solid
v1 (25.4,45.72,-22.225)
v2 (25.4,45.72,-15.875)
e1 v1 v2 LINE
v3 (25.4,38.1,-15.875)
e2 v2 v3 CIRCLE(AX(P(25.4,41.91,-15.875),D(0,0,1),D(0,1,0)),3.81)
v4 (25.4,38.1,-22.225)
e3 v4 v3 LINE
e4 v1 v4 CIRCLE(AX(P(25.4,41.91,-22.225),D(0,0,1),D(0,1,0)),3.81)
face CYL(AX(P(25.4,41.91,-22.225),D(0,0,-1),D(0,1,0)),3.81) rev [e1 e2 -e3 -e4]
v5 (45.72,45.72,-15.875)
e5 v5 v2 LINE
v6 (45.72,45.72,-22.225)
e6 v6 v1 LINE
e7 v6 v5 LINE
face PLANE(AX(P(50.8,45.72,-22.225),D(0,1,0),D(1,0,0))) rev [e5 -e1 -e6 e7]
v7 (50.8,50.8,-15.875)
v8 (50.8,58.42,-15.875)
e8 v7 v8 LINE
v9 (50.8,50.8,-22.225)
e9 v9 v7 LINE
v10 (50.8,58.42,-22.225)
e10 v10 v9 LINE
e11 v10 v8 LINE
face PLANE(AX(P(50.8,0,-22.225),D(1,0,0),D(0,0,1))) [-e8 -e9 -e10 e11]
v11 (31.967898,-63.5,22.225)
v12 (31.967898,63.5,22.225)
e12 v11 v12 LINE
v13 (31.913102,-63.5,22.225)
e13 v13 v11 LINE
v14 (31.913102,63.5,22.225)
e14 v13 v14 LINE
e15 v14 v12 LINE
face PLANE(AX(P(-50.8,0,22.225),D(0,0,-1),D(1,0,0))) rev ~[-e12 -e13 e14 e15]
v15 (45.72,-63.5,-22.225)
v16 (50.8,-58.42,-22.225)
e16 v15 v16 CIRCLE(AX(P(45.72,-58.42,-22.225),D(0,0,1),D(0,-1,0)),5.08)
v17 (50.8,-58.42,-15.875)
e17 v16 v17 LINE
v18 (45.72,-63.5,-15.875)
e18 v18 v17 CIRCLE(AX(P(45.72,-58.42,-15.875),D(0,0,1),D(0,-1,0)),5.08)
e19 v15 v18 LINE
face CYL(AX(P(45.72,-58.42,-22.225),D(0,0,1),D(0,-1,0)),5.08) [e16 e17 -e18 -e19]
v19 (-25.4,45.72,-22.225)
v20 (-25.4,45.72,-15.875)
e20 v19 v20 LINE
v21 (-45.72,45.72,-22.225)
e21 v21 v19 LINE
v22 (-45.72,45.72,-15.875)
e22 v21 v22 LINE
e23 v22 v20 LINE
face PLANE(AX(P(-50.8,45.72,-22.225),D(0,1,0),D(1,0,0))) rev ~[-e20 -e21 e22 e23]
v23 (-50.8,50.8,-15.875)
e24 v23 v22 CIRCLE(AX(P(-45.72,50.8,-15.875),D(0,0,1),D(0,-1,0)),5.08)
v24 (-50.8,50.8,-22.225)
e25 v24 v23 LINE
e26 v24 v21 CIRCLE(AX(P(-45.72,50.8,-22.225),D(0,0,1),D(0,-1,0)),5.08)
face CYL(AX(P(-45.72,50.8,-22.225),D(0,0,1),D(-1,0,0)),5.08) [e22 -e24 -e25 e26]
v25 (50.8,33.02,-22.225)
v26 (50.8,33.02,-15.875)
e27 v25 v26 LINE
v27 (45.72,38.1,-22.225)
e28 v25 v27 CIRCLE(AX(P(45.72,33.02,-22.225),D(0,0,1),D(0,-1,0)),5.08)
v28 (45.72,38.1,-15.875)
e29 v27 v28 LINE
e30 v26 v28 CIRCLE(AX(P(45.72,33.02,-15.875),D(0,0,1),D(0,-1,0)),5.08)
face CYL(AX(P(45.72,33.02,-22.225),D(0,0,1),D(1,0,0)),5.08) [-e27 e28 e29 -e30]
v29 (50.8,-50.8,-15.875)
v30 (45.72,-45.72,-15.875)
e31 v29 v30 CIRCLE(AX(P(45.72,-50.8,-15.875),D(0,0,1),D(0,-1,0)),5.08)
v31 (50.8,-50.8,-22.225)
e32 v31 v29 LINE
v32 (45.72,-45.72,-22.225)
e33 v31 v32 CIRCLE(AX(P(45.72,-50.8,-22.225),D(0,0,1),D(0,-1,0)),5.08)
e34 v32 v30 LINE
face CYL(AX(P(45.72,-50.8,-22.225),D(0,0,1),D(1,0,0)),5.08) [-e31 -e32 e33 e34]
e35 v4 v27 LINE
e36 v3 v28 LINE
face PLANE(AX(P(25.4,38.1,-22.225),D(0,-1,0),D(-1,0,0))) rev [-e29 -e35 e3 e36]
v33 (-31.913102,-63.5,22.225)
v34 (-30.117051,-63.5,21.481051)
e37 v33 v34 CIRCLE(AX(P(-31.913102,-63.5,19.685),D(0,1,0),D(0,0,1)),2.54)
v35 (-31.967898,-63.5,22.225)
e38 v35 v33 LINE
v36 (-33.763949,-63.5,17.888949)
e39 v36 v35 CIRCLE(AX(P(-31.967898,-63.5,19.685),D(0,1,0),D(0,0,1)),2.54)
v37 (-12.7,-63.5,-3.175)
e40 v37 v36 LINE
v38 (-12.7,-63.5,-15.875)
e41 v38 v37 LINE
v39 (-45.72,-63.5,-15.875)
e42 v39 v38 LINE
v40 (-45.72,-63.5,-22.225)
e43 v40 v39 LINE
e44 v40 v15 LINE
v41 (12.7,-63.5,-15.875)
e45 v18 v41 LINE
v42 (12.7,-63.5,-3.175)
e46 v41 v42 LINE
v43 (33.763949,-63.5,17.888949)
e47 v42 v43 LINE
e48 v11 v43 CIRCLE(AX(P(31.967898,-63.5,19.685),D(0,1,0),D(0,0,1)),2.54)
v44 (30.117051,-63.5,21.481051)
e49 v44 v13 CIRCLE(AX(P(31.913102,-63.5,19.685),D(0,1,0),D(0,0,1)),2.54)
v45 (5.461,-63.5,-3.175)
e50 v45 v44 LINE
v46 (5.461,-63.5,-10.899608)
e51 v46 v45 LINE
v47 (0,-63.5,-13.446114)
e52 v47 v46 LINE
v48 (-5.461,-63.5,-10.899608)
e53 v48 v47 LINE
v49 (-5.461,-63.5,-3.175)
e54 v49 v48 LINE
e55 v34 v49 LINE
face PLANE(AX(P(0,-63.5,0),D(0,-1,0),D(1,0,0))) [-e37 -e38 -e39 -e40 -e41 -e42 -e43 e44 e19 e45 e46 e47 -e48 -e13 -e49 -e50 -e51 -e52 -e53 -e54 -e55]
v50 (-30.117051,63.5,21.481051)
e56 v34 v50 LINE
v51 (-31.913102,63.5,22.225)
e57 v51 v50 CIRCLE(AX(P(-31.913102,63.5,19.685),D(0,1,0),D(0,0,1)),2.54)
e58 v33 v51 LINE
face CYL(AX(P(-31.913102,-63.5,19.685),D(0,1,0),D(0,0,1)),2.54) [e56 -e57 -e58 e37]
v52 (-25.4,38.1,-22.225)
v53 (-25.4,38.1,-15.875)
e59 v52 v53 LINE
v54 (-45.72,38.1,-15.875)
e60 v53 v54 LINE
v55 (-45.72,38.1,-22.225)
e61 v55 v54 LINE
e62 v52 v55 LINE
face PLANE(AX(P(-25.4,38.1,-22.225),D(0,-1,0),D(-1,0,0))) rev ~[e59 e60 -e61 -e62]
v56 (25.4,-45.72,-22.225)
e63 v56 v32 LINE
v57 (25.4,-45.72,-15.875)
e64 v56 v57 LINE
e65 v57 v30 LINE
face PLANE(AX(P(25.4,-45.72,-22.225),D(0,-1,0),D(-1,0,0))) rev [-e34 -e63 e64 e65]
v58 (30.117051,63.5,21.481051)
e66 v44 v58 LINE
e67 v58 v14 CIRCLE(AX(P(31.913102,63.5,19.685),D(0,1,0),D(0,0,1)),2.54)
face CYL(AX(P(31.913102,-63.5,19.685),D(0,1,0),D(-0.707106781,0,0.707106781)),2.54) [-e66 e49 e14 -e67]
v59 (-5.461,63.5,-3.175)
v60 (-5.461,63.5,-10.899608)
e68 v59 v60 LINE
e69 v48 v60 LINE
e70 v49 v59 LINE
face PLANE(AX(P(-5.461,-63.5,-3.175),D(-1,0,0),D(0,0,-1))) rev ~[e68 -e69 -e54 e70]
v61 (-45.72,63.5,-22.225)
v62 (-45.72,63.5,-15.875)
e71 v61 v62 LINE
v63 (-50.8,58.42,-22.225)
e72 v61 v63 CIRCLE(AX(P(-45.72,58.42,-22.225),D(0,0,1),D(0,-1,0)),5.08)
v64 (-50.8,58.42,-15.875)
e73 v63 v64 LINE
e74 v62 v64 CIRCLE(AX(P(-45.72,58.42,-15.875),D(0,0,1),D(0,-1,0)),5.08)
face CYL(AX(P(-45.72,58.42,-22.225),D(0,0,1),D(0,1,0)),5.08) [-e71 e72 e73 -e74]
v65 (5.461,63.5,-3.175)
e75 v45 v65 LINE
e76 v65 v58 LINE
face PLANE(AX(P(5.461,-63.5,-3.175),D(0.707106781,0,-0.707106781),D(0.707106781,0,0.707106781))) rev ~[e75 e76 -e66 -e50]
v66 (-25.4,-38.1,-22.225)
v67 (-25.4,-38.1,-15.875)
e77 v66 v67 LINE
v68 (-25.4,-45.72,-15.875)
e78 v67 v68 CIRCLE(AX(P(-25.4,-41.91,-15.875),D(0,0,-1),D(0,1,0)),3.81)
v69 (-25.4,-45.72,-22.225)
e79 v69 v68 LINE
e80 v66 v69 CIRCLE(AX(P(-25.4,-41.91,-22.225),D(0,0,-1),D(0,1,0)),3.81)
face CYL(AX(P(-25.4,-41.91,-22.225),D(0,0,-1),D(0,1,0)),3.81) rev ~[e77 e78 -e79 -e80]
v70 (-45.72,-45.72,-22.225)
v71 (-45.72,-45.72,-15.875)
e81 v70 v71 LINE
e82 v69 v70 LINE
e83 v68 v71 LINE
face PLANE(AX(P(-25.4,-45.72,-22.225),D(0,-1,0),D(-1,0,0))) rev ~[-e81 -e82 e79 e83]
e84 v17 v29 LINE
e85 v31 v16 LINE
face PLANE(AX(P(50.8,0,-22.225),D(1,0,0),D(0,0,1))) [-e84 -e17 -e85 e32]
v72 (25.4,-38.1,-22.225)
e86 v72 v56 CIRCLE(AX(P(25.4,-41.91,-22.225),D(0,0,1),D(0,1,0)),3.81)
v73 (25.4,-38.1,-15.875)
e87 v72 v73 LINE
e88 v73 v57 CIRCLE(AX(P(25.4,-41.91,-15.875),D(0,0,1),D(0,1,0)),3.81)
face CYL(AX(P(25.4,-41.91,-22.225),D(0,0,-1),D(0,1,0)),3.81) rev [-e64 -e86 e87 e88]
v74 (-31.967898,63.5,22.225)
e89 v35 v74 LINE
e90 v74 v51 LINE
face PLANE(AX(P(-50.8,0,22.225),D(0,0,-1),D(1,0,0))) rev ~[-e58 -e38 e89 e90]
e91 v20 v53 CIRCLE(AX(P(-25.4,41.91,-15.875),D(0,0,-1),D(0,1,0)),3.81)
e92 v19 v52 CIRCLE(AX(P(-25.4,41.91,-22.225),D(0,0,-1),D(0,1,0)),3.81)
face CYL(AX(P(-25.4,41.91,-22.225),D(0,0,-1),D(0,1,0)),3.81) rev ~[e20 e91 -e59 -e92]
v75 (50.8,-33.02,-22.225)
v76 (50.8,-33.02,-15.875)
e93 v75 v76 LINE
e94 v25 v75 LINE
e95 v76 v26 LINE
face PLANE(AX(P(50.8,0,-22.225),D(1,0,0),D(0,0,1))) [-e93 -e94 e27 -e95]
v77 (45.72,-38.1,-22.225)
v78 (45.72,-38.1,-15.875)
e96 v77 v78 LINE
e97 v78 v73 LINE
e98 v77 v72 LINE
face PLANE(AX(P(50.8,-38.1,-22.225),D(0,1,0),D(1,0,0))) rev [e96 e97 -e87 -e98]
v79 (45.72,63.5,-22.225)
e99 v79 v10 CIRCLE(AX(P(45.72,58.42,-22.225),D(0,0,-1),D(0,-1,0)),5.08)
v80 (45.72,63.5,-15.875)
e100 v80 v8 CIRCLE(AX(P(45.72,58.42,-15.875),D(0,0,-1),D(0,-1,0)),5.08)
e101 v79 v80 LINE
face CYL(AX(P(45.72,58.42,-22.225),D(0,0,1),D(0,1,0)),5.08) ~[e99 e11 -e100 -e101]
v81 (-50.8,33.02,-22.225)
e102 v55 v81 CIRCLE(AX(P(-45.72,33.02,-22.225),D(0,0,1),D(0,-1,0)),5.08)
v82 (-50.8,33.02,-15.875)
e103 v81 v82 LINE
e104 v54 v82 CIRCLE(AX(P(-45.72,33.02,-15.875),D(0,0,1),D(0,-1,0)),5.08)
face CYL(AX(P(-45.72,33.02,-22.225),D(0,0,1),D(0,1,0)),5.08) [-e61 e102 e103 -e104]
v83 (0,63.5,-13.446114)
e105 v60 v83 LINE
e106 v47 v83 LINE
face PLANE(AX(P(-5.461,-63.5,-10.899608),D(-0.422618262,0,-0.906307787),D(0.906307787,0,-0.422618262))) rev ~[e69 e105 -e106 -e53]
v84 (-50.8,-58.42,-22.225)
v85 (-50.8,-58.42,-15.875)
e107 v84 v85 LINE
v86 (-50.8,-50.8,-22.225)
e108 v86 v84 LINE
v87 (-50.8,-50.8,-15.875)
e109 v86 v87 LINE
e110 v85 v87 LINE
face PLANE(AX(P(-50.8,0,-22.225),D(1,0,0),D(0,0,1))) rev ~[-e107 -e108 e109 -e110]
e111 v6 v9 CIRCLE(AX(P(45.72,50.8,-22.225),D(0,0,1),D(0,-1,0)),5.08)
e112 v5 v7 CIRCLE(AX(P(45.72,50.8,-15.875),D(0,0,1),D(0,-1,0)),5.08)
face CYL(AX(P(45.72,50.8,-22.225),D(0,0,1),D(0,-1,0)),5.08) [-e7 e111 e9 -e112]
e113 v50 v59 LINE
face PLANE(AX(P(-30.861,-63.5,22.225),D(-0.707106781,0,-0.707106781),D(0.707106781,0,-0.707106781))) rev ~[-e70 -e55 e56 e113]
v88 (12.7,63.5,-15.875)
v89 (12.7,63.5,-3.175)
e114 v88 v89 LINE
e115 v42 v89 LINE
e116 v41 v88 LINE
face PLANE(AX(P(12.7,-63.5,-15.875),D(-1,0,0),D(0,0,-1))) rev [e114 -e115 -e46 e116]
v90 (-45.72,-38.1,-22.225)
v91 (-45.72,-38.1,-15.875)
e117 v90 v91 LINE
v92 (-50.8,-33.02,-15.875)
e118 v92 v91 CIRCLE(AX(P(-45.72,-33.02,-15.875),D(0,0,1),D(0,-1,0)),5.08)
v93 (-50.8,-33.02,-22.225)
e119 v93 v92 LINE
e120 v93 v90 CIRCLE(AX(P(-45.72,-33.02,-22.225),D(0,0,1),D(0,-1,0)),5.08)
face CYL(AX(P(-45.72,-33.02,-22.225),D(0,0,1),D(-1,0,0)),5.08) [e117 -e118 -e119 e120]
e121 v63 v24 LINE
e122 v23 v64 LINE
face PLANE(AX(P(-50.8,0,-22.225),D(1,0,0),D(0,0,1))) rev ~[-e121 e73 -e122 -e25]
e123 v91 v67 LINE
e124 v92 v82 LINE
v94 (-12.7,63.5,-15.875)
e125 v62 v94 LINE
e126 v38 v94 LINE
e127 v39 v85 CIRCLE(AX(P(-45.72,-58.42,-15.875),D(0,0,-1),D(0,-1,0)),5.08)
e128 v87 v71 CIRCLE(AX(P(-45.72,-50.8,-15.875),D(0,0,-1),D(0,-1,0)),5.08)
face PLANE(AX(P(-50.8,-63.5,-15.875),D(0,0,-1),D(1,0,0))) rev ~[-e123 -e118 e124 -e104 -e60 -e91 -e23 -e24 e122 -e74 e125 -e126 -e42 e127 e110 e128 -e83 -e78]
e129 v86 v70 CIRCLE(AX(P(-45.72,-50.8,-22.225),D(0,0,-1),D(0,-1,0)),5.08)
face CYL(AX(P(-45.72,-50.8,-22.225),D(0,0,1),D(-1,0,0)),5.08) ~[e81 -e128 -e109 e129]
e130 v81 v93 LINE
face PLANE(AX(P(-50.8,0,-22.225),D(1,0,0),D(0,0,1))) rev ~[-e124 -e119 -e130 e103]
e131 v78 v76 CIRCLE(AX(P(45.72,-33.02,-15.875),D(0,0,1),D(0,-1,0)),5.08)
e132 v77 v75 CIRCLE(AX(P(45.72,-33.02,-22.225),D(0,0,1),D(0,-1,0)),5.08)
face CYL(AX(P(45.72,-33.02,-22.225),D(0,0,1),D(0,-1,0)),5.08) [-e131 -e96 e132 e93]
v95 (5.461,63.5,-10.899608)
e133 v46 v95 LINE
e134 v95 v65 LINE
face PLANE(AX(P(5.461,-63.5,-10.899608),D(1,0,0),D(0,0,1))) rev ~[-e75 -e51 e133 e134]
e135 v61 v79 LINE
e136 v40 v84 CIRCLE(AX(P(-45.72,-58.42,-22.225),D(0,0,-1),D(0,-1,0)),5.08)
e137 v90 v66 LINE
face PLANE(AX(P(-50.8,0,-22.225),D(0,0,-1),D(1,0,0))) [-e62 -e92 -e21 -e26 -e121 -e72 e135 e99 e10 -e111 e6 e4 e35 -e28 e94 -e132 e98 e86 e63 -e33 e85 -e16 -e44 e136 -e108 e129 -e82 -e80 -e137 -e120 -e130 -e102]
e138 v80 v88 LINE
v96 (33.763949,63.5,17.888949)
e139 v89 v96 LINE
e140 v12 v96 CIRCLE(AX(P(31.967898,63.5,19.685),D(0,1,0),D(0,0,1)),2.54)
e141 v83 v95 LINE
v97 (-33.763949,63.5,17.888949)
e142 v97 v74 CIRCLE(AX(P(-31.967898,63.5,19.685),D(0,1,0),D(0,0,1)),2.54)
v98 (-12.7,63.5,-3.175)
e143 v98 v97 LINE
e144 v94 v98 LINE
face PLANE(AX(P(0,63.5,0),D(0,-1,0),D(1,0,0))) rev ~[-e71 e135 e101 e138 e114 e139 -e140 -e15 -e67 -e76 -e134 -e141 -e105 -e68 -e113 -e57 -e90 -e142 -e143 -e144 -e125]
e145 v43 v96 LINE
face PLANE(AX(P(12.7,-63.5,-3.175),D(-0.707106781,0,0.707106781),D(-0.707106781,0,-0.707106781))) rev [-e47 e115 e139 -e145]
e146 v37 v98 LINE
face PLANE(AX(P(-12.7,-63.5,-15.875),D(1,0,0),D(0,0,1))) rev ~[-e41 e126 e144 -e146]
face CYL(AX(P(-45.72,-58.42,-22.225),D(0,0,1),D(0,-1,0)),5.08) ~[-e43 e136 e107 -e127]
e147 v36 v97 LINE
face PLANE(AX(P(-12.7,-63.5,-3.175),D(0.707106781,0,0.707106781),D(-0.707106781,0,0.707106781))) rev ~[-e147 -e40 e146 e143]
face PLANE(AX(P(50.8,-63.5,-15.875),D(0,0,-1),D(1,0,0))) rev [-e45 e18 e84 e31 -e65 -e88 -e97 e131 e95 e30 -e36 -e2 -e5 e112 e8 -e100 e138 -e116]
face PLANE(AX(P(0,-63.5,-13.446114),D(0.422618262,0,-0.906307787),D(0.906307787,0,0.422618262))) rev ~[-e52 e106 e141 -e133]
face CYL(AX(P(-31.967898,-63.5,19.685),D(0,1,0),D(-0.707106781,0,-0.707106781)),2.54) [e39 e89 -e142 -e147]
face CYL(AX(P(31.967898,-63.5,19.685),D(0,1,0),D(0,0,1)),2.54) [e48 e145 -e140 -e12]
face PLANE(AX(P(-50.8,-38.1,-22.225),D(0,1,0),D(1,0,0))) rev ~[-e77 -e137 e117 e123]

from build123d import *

# Parameters (mm, degrees)
F0_W     = 101.6
F0_H     = 44.45
F1_DEPTH = 63.5
F3_DEPTH = 127.001
F5_DEPTH = 127.001
F6_R     = 2.54
F8_DEPTH = 6.35
F9_R     = 5.08


# Not quite as in the source:
# - a pattern or mirror of a feature is missing from the dataset's text; its kind, count and spacing are read off the source's solid


with BuildPart() as f1:
    # F0 (on Front) → F1 (new body, symmetric)
    with BuildSketch(Plane.XZ):
        Rectangle(F0_W, F0_H)
    extrude(amount=F1_DEPTH, both=True)

    # F2 (on face) → F3 (cut, through all)
    with BuildSketch(Plane.XZ.offset(63.5)):
        Polygon((-50.8, -15.875), (-12.7, -15.875), (-12.7, -3.175), (-38.1, 22.225), (-50.8, 22.225), align=None)
    f3 = extrude(amount=-F3_DEPTH, mode=Mode.SUBTRACT)

    # F3_copies: F3 across plane
    add(f3.mirror(Plane(origin=(0, 0, 0), x_dir=(0, 0, 1), z_dir=(1, 0, 0))), mode=Mode.SUBTRACT)

    # F4 (on face) → F5 (cut, through all)
    with BuildSketch(Plane.XZ.offset(63.5)):
        Polygon((30.861, 22.225), (-30.861, 22.225), (-5.461, -3.175), (-5.461, -10.8996083293), (0, -13.4461144505), (5.461, -10.8996083293), (5.461, -3.175), align=None)
    extrude(amount=-F5_DEPTH, mode=Mode.SUBTRACT)

    # F6
    f6_edges = [f1.edges().sort_by_distance(p)[0] for p in [
        (-38.1, 0, 22.225),
        (-30.861, 0, 22.225),
        (30.861, 0, 22.225),
        (38.1, 0, 22.225),
    ]]
    fillet(f6_edges, radius=F6_R)

    # F7 (on face) → F8 (cut, through all)
    with BuildSketch(Plane(origin=(0, 0, -22.225), x_dir=(1, 0, 0), z_dir=(0, 0, -1))):
        with BuildLine():
            Line((-25.4, 45.72), (-50.8, 45.72))
            Line((-50.8, 45.72), (-50.8, 38.1))
            Line((-50.8, 38.1), (-25.4, 38.1))
            ThreePointArc((-25.4, 38.1), (-21.59, 41.91), (-25.4, 45.72))
        make_face()
        with BuildLine():
            Line((-25.4, -38.1), (-50.8, -38.1))
            Line((-50.8, -38.1), (-50.8, -45.72))
            Line((-50.8, -45.72), (-25.4, -45.72))
            ThreePointArc((-25.4, -45.72), (-21.59, -41.91), (-25.4, -38.1))
        make_face()
    f8 = extrude(amount=-F8_DEPTH, mode=Mode.SUBTRACT)

    # F8_copies: F8 across plane
    add(f8.mirror(Plane(origin=(0, 0, 0), x_dir=(0, 0, 1), z_dir=(1, 0, 0))), mode=Mode.SUBTRACT)

    # F9
    f9_edges = [f1.edges().sort_by_distance(p)[0] for p in [
        (-50.8, -63.5, -19.05),
        (-50.8, 63.5, -19.05),
        (50.8, -63.5, -19.05),
        (50.8, 63.5, -19.05),
        (-50.8, -45.72, -19.05),
        (-50.8, 38.1, -19.05),
        (-50.8, 45.72, -19.05),
        (-50.8, -38.1, -19.05),
        (50.8, 45.72, -19.05),
        (50.8, -45.72, -19.05),
        (50.8, -38.1, -19.05),
        (50.8, 38.1, -19.05),
    ]]
    fillet(f9_edges, radius=F9_R)


solid = f1.part
